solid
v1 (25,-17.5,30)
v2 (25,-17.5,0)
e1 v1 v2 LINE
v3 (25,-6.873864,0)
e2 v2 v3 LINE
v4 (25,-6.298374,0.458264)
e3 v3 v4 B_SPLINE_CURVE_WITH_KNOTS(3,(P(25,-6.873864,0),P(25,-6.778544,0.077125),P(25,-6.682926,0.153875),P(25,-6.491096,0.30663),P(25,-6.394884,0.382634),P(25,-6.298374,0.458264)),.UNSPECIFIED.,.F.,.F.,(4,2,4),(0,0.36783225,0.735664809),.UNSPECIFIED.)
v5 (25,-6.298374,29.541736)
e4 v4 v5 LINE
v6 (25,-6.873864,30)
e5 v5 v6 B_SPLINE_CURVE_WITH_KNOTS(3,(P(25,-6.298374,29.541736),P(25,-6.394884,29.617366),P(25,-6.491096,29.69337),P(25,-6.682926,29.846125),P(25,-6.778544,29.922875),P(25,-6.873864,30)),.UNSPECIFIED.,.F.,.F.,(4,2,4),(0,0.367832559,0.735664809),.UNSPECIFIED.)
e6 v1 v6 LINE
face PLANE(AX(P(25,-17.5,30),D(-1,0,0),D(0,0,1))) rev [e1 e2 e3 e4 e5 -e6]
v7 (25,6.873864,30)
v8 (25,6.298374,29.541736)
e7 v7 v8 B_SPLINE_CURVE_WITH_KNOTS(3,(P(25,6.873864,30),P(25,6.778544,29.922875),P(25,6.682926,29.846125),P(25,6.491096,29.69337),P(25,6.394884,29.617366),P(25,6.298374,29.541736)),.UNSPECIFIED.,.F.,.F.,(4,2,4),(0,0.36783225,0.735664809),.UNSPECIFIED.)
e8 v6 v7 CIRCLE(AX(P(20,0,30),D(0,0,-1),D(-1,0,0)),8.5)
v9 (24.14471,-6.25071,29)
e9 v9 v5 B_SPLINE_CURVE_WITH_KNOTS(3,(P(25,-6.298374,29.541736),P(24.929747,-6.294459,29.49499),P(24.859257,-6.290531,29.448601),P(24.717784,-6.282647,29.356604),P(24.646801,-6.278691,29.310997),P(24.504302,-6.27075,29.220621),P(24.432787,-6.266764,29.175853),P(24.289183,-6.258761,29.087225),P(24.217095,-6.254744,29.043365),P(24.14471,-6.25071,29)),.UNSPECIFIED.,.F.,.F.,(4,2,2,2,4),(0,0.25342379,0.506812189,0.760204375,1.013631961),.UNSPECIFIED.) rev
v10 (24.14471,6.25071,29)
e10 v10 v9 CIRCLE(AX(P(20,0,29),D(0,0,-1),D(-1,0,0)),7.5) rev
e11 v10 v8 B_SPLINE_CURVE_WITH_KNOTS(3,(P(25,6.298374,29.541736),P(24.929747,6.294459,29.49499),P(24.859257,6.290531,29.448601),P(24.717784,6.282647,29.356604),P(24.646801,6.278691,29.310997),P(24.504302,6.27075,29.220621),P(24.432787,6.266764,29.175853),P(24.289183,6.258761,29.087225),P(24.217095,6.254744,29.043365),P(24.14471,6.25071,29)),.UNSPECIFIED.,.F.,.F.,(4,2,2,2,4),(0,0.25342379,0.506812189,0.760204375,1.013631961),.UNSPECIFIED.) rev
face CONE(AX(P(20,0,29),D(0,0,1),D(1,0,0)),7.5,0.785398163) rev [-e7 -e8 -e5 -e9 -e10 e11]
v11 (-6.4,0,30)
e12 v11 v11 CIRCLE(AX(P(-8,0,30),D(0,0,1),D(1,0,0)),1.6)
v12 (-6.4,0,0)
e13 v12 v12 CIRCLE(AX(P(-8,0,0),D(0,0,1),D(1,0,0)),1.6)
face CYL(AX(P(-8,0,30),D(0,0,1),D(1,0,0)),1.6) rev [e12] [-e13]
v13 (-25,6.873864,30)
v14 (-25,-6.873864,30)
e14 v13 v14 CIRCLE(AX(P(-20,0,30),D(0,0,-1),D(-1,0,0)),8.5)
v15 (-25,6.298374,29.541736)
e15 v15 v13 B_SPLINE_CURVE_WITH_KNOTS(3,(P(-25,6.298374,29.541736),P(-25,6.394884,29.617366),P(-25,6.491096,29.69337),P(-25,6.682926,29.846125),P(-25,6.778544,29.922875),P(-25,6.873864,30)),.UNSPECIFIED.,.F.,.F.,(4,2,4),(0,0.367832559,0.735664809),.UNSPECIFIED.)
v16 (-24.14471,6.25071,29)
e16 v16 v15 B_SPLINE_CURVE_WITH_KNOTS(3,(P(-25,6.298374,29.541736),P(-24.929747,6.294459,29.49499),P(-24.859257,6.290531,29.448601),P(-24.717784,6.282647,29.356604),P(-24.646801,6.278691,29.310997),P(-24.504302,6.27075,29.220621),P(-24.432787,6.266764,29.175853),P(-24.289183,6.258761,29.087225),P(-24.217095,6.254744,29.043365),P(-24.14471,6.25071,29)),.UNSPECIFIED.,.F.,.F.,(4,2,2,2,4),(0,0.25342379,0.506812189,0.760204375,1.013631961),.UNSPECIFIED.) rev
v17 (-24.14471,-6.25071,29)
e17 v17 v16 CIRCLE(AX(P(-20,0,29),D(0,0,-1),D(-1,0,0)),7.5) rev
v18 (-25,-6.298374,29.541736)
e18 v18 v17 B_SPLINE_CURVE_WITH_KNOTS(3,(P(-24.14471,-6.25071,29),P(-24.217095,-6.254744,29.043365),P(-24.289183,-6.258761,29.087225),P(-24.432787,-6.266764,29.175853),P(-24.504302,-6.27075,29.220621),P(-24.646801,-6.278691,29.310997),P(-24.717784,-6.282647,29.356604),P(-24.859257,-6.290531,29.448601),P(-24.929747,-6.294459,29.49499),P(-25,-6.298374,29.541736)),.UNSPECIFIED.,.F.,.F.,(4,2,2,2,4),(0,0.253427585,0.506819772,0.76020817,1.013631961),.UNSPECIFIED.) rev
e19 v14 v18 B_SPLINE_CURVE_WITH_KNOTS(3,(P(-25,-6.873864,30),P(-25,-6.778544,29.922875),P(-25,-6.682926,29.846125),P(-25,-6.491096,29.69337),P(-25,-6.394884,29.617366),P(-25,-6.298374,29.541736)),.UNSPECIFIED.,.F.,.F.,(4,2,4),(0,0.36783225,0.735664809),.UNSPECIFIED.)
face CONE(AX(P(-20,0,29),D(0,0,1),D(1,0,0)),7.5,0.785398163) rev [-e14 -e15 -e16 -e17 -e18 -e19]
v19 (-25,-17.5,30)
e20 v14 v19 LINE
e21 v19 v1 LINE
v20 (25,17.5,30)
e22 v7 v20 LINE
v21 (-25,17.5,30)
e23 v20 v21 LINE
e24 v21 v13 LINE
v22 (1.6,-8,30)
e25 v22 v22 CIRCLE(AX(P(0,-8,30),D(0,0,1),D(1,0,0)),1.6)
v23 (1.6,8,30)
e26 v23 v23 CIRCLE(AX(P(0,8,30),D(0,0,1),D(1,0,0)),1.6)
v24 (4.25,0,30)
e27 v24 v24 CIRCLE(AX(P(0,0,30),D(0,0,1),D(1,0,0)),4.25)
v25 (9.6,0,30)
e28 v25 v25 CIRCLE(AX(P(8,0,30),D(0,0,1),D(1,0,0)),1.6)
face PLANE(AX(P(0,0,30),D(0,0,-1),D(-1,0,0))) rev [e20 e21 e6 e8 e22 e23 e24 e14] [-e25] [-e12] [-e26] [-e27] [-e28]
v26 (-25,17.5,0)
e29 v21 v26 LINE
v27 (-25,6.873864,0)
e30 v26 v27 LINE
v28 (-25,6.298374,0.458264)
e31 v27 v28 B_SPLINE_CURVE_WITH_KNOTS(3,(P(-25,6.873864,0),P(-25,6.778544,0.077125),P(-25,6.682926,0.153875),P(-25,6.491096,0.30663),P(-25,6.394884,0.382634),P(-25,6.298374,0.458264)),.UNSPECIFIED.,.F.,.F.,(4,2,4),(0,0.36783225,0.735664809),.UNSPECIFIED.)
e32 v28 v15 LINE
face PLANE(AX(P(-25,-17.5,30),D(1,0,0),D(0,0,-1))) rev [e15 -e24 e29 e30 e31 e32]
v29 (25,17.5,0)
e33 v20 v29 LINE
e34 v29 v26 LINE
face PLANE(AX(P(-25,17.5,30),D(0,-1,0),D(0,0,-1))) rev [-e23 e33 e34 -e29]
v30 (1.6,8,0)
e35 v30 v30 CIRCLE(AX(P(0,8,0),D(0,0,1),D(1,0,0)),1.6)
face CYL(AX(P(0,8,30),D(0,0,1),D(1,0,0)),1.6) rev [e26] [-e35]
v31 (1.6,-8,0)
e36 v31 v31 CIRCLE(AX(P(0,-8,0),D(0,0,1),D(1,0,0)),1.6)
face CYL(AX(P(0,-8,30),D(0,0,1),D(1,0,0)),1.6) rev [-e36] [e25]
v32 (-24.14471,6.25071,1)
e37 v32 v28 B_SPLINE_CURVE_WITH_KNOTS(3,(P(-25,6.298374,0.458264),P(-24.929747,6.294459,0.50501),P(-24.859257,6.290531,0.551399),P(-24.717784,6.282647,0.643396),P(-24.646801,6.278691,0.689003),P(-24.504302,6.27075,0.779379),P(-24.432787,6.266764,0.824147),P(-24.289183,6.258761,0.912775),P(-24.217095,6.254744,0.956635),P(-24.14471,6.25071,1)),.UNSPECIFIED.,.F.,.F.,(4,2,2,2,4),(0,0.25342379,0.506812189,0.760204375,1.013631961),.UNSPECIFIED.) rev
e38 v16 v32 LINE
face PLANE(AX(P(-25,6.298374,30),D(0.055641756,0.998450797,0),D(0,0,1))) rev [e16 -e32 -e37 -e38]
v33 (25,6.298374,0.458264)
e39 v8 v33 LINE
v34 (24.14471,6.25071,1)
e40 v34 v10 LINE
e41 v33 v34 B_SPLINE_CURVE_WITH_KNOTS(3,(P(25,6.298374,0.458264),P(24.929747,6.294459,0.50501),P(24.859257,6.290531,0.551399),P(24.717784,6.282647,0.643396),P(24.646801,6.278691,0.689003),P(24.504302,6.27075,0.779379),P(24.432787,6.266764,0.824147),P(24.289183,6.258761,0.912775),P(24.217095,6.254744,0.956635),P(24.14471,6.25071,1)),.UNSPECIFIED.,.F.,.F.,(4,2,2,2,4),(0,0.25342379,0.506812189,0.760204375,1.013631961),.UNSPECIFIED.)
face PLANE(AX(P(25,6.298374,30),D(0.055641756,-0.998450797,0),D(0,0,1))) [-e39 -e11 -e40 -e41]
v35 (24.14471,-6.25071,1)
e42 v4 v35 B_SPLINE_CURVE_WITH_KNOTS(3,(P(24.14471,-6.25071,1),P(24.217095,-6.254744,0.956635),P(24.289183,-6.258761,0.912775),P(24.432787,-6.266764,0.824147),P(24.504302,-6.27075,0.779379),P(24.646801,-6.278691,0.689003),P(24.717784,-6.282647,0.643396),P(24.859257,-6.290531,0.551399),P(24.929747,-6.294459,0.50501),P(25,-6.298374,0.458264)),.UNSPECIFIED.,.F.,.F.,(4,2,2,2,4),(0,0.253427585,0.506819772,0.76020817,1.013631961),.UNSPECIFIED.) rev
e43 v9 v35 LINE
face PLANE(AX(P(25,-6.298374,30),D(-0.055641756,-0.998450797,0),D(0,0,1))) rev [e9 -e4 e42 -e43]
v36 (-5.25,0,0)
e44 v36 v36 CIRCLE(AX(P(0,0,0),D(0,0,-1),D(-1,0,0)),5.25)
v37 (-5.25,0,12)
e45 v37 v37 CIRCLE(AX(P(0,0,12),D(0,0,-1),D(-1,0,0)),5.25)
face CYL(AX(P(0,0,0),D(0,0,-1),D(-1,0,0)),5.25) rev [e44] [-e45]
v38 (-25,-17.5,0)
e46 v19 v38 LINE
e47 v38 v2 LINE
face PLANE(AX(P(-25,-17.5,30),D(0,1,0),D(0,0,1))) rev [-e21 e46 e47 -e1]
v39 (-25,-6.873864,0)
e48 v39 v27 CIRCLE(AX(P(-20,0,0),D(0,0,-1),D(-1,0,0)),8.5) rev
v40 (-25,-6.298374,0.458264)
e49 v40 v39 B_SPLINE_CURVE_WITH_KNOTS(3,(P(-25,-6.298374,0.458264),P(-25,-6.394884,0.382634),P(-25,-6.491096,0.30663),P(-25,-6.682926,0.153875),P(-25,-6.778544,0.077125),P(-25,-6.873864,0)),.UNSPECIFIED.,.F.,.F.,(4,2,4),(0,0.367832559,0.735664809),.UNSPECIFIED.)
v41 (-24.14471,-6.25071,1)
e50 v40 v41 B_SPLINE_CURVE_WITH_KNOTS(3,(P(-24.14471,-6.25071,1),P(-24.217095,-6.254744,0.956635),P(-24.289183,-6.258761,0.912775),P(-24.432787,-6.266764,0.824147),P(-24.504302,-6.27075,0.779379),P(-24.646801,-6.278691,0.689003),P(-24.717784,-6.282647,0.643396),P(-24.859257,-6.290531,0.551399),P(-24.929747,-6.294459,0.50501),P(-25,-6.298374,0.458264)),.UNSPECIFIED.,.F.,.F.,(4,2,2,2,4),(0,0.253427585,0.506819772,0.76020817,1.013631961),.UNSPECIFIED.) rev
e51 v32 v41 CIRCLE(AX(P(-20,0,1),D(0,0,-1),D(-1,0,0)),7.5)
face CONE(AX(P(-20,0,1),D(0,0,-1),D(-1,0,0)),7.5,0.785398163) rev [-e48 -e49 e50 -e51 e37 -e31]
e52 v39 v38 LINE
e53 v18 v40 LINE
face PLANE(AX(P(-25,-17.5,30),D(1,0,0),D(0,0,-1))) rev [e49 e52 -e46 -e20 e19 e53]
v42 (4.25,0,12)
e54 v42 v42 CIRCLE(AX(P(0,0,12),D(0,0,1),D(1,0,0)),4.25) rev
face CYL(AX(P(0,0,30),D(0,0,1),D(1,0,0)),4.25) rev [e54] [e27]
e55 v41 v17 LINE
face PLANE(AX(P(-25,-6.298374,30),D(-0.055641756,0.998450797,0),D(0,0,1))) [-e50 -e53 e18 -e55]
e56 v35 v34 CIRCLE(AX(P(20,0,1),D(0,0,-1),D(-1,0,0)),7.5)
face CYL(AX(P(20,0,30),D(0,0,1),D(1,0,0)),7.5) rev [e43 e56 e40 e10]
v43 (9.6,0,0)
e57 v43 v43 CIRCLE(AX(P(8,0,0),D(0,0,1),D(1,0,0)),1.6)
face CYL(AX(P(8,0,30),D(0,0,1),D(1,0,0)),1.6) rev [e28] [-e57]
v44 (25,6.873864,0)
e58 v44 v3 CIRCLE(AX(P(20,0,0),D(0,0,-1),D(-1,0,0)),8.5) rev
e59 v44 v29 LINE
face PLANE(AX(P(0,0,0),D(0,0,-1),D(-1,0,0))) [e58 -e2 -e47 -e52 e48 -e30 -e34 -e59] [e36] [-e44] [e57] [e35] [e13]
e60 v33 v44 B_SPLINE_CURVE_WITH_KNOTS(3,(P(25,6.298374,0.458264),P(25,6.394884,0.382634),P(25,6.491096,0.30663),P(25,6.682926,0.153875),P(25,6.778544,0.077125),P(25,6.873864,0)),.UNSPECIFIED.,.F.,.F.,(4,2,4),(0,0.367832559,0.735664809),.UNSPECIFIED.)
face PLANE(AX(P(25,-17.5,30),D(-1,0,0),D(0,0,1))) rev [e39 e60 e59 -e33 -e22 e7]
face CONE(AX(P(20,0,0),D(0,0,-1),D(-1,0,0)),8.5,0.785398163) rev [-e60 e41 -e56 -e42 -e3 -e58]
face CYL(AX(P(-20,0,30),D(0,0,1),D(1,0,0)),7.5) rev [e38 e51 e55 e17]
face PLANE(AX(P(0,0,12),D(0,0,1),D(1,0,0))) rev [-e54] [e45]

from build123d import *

# Parameters (mm, degrees)
SKETCH_1_W          = 50
SKETCH_1_H          = 35
EXTRUDE_1_DEPTH     = 30
HOLE_WIZARD_345_D   = 8.5
HOLE_WIZARD_450_D   = 3.2
HOLE_WIZARD_604_D   = 15
CHAMFER_1_SIZE      = 1
CHAMFER_1_SIZE_2    = 0.708203932
HOLE_WIZARD_1_D     = 10.5
HOLE_WIZARD_1_DEPTH = 12


with BuildPart() as part:
    # 草图1 → 凸台-拉伸1 (new body)
    with BuildSketch(Plane.XY):
        Rectangle(SKETCH_1_W, SKETCH_1_H)
    extrude(amount=EXTRUDE_1_DEPTH)

    # Hole Wizard 345 (through all)
    with Locations(Plane.XY.offset(30)):
        with Locations((0, 0)):
            Hole(HOLE_WIZARD_345_D / 2)

    # Hole Wizard 450 (through all)
    with Locations(Plane.XY.offset(30)):
        with Locations((8, 0), (0, 8), (-8, 0), (0, -8)):
            Hole(HOLE_WIZARD_450_D / 2)

    # Hole Wizard 604 (through all)
    with Locations(Plane.XY.offset(30)):
        with Locations((20, 0), (-20, 0)):
            Hole(HOLE_WIZARD_604_D / 2)

    # 倒角1
    # the kernel refuses this chamfer: 1, 0.708203932 mm, written as the material it takes off along each edge
    with BuildSketch(Plane(origin=(-20, 0, 0), x_dir=(-0.8790200859122482, 0.4767847402789059, 0), z_dir=(-0.4767847402789059, -0.8790200859122482, 0))) as chamfer_1_piece_1:
        Polygon((7.5, -CHAMFER_1_SIZE), (7.5 + CHAMFER_1_SIZE, 0), (7.5, 0), align=None)
    revolve(axis=Axis((-20, 0, 0), (0, 0, -1)), revolution_arc=303.048763938, mode=Mode.SUBTRACT)
    with BuildSketch(Plane(origin=(-20, 0, 30), x_dir=(-0.879020085912248, 0.47678474027890627, 0), z_dir=(-0.47678474027890627, -0.879020085912248, 0))) as chamfer_1_piece_2:
        Polygon((7.5 + CHAMFER_1_SIZE, 0), (7.5, CHAMFER_1_SIZE), (7.5, 0), align=None)
    revolve(axis=Axis((-20, 0, 30), (0, 0, -1)), revolution_arc=303.048763938, mode=Mode.SUBTRACT)
    with BuildSketch(Plane(origin=(20, 0, 30), x_dir=(0.879020085912248, -0.4767847402789061, 0), z_dir=(0.4767847402789061, 0.879020085912248, 0))) as chamfer_1_piece_3:
        Polygon((7.5 + CHAMFER_1_SIZE, 0), (7.5, CHAMFER_1_SIZE), (7.5, 0), align=None)
    revolve(axis=Axis((20, 0, 30), (0, 0, -1)), revolution_arc=303.048763938, mode=Mode.SUBTRACT)
    with BuildSketch(Plane(origin=(20, 0, 0), x_dir=(0.8790200859122481, 0.476784740278906, 0), z_dir=(0.476784740278906, -0.8790200859122481, 0))) as chamfer_1_piece_4:
        Polygon((7.5, CHAMFER_1_SIZE), (7.5 + CHAMFER_1_SIZE, 0), (7.5, 0), align=None)
    revolve(axis=Axis((20, 0, 0), (0, 0, 1)), revolution_arc=303.048763938, mode=Mode.SUBTRACT)
    with BuildSketch(Plane(origin=(-25, 5.590169944, 32.778051389), x_dir=(0.7914486393779661, 0.611235675682274, 0), z_dir=(0, 0, -1)), Plane(origin=(25, -5.590169944, 32.778051389), x_dir=(-0.7914486393779661, -0.611235675682274, 0), z_dir=(0, 0, -1))) as chamfer_1_piece_5:
        with BuildLine():
            Line((1.080663788, 0), (CHAMFER_1_SIZE_2 * 0.611235676113, -CHAMFER_1_SIZE_2 * 0.791448639936))
            Line((CHAMFER_1_SIZE_2 * 0.611235676113, -CHAMFER_1_SIZE_2 * 0.791448639936), (0, 0))
            ThreePointArc((0, 0), (0.555522087, -0.019473843), (1.080663788, 0))
        make_face()
    extrude(amount=35.556102778, mode=Mode.SUBTRACT)
    with BuildSketch(Plane(origin=(-25, -5.590169944, 32.778051389), x_dir=(0.7914486393779665, -0.6112356756822735, 0), z_dir=(0, 0, -1))) as chamfer_1_piece_6:
        with BuildLine():
            Line((1.080663788, 0), (CHAMFER_1_SIZE_2 * 0.611235676113, CHAMFER_1_SIZE_2 * 0.791448639936))
            Line((CHAMFER_1_SIZE_2 * 0.611235676113, CHAMFER_1_SIZE_2 * 0.791448639936), (0, 0))
            ThreePointArc((0, 0), (0.555522087, 0.019473843), (1.080663788, 0))
        make_face()
    extrude(amount=35.556102778, mode=Mode.SUBTRACT)
    with BuildSketch(Plane(origin=(25, 5.590169944, 32.778051389), x_dir=(0, 1, 0), z_dir=(0, 0, -1))) as chamfer_1_piece_7:
        with BuildLine():
            Line((CHAMFER_1_SIZE_2, 0), (0.660540261, -0.855289885))
            ThreePointArc((0.660540261, -0.855289885), (0.354967464, -0.427764092), (0, 0))
            Line((0, 0), (CHAMFER_1_SIZE_2, 0))
        make_face()
    extrude(amount=35.556102778, mode=Mode.SUBTRACT)

    # 孔1
    with Locations(Plane(origin=(0, 0, 0), x_dir=(-1, 0, 0), z_dir=(0, 0, -1))):
        with Locations((0, 0)):
            Hole(HOLE_WIZARD_1_D / 2, depth=HOLE_WIZARD_1_DEPTH)


solid = part.part
